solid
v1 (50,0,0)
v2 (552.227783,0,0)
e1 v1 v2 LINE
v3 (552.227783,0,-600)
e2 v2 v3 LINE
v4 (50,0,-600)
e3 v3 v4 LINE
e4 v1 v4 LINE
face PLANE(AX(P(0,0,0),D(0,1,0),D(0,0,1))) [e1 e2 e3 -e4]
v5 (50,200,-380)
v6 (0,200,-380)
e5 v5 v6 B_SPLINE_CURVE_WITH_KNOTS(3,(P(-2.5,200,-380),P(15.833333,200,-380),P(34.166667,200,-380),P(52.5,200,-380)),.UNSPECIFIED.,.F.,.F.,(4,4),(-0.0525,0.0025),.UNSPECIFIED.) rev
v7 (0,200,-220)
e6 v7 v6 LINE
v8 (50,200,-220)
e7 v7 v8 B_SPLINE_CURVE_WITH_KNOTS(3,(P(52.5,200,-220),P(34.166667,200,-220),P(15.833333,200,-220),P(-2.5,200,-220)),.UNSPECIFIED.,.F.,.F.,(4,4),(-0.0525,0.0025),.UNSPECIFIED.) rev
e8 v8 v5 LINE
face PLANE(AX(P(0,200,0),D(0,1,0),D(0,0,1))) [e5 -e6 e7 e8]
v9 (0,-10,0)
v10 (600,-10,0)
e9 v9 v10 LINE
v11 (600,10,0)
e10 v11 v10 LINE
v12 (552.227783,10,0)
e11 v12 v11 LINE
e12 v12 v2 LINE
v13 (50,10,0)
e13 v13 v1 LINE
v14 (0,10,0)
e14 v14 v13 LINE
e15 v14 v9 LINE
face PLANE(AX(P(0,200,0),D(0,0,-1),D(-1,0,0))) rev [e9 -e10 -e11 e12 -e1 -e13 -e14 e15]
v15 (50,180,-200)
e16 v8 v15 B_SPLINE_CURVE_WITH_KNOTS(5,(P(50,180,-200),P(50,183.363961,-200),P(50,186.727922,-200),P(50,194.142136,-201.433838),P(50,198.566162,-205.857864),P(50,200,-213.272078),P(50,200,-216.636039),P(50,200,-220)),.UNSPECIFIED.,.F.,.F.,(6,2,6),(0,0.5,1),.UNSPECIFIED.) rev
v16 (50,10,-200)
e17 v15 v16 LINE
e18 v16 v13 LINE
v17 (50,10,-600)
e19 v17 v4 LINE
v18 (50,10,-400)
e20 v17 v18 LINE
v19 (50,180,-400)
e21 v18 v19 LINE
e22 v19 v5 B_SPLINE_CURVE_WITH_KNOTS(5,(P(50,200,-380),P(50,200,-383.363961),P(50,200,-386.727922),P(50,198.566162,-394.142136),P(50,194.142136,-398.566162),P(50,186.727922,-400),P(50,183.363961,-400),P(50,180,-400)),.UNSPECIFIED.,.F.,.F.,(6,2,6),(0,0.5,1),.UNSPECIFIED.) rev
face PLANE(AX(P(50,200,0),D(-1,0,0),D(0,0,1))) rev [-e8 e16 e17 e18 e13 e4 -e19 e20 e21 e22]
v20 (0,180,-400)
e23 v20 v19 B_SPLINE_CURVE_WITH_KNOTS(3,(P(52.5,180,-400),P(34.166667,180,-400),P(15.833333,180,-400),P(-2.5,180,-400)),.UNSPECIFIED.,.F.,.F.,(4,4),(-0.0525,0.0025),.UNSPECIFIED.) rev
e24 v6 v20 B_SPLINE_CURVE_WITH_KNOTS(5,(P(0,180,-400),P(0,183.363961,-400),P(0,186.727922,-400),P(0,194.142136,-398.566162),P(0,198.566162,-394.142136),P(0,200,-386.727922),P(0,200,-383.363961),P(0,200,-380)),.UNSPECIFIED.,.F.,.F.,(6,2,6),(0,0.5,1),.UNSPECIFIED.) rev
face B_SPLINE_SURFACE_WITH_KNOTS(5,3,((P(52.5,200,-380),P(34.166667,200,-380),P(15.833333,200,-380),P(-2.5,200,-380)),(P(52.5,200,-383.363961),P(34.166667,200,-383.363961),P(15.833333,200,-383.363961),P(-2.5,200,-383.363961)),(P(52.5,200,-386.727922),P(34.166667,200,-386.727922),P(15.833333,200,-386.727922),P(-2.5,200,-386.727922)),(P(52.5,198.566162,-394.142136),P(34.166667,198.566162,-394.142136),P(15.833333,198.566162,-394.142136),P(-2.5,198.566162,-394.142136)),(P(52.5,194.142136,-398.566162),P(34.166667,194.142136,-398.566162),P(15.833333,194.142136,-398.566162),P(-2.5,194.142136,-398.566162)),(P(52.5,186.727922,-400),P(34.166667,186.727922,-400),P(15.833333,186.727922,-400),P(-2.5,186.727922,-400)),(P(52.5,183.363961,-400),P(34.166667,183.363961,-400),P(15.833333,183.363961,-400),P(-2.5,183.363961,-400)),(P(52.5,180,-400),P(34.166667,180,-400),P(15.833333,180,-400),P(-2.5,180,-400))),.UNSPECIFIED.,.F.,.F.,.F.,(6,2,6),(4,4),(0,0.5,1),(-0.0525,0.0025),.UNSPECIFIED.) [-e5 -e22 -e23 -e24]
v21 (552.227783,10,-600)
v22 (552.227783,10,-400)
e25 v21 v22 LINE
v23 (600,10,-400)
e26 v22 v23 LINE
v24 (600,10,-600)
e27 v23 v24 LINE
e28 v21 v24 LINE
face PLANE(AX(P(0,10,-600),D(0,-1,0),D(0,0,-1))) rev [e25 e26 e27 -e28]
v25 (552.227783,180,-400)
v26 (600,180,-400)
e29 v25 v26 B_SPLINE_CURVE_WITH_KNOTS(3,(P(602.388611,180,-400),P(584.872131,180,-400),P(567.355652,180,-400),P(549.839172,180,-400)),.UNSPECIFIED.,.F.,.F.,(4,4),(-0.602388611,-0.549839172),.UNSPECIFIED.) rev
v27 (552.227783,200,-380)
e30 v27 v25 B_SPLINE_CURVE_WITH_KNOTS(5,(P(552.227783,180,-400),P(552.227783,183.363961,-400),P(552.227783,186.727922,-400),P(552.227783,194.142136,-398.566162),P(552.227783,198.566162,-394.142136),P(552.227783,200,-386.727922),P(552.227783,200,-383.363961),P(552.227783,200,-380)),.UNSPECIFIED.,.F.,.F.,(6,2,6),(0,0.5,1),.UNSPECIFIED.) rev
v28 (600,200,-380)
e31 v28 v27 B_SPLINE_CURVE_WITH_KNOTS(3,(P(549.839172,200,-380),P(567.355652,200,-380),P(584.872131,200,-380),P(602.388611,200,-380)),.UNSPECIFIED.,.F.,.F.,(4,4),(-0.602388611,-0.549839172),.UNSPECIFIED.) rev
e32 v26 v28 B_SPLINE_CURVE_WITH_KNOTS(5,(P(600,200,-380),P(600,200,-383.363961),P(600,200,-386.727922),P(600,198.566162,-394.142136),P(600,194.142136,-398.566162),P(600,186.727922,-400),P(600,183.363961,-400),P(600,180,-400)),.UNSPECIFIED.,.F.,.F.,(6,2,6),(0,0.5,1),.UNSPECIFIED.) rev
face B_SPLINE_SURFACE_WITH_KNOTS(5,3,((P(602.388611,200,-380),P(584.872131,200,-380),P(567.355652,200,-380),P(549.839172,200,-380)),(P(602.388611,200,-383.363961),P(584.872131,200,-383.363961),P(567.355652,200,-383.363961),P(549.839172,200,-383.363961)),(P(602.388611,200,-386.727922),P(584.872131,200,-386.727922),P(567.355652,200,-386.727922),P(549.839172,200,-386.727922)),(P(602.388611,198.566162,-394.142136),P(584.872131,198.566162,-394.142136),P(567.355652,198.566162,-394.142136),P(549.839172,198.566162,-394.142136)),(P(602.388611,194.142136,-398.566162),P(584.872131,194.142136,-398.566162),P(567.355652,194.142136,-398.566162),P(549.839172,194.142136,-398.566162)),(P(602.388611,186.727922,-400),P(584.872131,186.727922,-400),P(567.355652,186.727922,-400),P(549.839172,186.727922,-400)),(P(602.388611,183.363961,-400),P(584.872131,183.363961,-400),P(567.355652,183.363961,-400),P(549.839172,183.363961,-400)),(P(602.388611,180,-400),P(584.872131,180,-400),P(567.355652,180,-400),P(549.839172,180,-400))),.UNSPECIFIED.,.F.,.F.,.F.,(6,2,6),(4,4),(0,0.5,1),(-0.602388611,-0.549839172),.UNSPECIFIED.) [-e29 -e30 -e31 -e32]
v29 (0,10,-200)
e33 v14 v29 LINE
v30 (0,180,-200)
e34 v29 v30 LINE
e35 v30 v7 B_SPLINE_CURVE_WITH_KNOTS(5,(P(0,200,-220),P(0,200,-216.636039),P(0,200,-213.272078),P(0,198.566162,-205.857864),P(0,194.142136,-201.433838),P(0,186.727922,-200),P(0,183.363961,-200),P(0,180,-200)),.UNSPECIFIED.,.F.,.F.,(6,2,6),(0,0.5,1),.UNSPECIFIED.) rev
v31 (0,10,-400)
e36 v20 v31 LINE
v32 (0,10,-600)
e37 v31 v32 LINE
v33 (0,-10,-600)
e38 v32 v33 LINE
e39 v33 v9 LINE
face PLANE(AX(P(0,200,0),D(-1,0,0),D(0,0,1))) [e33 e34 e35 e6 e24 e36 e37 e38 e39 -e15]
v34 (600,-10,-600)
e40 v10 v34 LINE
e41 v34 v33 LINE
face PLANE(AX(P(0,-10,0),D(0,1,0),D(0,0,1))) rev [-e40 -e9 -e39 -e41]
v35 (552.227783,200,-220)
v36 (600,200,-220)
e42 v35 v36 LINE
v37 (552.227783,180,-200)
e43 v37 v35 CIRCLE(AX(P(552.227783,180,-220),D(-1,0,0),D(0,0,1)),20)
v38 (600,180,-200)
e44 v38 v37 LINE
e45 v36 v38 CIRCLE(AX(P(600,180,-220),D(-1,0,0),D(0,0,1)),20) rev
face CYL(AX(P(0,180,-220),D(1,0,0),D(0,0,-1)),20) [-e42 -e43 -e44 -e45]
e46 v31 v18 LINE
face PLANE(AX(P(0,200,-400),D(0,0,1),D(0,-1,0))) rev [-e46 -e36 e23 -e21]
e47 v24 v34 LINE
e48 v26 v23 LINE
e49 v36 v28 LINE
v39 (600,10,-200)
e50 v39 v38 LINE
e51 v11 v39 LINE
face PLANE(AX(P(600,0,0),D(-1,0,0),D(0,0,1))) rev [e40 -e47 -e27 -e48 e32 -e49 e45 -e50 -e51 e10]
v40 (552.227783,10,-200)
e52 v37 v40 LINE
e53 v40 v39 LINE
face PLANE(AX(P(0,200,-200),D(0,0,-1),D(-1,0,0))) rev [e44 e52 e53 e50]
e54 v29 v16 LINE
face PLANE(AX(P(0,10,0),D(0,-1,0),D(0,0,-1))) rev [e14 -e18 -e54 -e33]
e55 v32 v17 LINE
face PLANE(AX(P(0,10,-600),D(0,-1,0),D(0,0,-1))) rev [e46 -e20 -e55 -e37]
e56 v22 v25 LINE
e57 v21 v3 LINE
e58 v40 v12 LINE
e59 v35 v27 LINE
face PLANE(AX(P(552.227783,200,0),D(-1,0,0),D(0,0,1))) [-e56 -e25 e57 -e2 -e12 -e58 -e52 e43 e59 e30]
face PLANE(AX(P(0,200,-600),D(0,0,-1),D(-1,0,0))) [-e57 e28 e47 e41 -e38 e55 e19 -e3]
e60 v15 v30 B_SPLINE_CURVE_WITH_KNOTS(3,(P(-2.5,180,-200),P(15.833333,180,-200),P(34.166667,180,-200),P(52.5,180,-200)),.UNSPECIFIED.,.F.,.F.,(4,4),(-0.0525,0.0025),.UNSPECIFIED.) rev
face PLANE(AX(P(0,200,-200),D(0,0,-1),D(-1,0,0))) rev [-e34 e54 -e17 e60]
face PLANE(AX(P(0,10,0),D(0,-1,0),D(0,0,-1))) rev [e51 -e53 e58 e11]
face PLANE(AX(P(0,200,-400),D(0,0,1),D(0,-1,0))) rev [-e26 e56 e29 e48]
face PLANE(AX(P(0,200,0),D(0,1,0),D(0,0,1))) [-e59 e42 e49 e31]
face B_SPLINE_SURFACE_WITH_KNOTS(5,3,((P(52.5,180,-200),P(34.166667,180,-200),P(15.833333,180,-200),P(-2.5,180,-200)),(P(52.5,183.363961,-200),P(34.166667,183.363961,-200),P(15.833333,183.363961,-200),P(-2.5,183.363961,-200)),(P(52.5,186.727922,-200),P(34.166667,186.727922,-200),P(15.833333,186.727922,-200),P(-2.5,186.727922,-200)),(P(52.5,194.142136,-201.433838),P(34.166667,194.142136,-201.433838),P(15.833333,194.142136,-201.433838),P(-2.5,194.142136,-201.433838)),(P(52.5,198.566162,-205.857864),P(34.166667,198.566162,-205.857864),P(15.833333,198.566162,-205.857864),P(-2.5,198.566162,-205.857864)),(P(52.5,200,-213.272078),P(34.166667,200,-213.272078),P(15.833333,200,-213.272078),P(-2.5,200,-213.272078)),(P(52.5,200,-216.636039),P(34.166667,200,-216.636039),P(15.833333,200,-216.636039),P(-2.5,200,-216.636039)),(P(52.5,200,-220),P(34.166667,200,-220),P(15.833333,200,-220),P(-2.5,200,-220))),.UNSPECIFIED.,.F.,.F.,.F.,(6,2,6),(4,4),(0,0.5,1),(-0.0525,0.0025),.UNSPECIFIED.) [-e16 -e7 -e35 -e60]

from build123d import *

# Parameters (mm, degrees)
ESBO_O1_W                  = 50
ESBO_O1_H                  = 600
RESSALTO_EXTRUS_O1_DEPTH   = 200
ESBO_O1_W_2                = 47.772216991
RESSALTO_EXTRUS_O1_2_DEPTH = 200
RESSALTO_EXTRUS_O4_START   = -210
ESBO_O4_W                  = 600
ESBO_O4_H                  = 600
RESSALTO_EXTRUS_O4_DEPTH   = 10
ESBO_O5_W                  = 200
ESBO_O5_H                  = 190
CORTE_EXTRUS_O1_DEPTH      = 872.779788708
ESBO_O6_W                  = 200
ESBO_O6_H                  = 190
CORTE_EXTRUS_O2_DEPTH      = 600
FILETE2_R                  = 20
FILETE3_SIZE               = 20
FILETE4_SIZE               = 20
FILETE5_SIZE               = 20


with BuildPart() as part:
    # Esboço1 → Ressalto-extrusão1 (new body)
    with BuildSketch(Plane(origin=(0, 0, 0), x_dir=(1, 0, 0), z_dir=(0, 1, 0))):
        with Locations((25, 300)):
            Rectangle(ESBO_O1_W, ESBO_O1_H)
    extrude(amount=RESSALTO_EXTRUS_O1_DEPTH)



with BuildPart() as body_2:
    # Esboço1 → Ressalto-extrus_o1 2 (new body)
    with BuildSketch(Plane(origin=(0, 0, 0), x_dir=(1, 0, 0), z_dir=(0, 1, 0))):
        with Locations((576.113891505, 300)):
            Rectangle(ESBO_O1_W_2, ESBO_O1_H)
    extrude(amount=RESSALTO_EXTRUS_O1_2_DEPTH)


with BuildPart() as part_1:
    add(part.part)

    add(body_2.part)  # Ressalto-extrusão4 merges body 2
    # Esboço4 → Ressalto-extrusão4 (add)
    with BuildSketch(Plane(origin=(0, 200, 0), x_dir=(1, 0, 0), z_dir=(0, 1, 0)).offset(RESSALTO_EXTRUS_O4_START)):
        with Locations((300, 300)):
            Rectangle(ESBO_O4_W, ESBO_O4_H)
    extrude(amount=RESSALTO_EXTRUS_O4_DEPTH)

    # Esboço5 → Corte-extrusão1 (cut, through all)
    with BuildSketch(Plane(origin=(600, 0, 0), x_dir=(0, 0, -1), z_dir=(1, 0, 0))):
        with Locations((100, 105)):
            Rectangle(ESBO_O5_W, ESBO_O5_H)
    extrude(amount=-CORTE_EXTRUS_O1_DEPTH, mode=Mode.SUBTRACT)

    # Esboço6 → Corte-extrusão2 (cut)
    with BuildSketch(Plane(origin=(600, 0, 0), x_dir=(0, 0, -1), z_dir=(1, 0, 0))):
        with Locations((500, 105)):
            Rectangle(ESBO_O6_W, ESBO_O6_H)
    extrude(amount=-CORTE_EXTRUS_O2_DEPTH, mode=Mode.SUBTRACT)

    # Filete2
    filete2_edges = [part_1.edges().sort_by_distance(p)[0] for p in [
        (576.113891505, 200, -200),
    ]]
    fillet(filete2_edges, radius=FILETE2_R)

    # Filete3
    # a fillet whose section is not a circle: 20 mm, written as the material it takes off along each edge
    with BuildSketch(Plane(origin=(650, 200, -400), x_dir=(0, 0, 1), z_dir=(-1, 0, 0))) as filete3_piece_1:
        with BuildLine():
            add(Edge.make_bspline([(FILETE3_SIZE, 0), (FILETE3_SIZE * 0.831801948466, 0), (FILETE3_SIZE * 0.663603896932, 0), (FILETE3_SIZE * 0.292893218813, -FILETE3_SIZE * 0.0716919198361), (FILETE3_SIZE * 0.0716919198361, -FILETE3_SIZE * 0.292893218813), (0, -FILETE3_SIZE * 0.663603896932), (0, -FILETE3_SIZE * 0.831801948466), (0, -FILETE3_SIZE)], knots=[0, 0, 0, 0, 0, 0, 0.5, 0.5, 1, 1, 1, 1, 1, 1], degree=5))
            Line((0, -FILETE3_SIZE), (0, 0))
            Line((0, 0), (FILETE3_SIZE, 0))
        make_face()
    extrude(amount=147.772216991, mode=Mode.SUBTRACT)

    # Filete4
    # a fillet whose section is not a circle: 20 mm, written as the material it takes off along each edge
    with BuildSketch(Plane(origin=(100, 200, -200), x_dir=(0, -1, 0), z_dir=(-1, 0, 0))) as filete4_piece_1:
        with BuildLine():
            add(Edge.make_bspline([(FILETE4_SIZE, 0), (FILETE4_SIZE * 0.831801948466, 0), (FILETE4_SIZE * 0.663603896932, 0), (FILETE4_SIZE * 0.292893218813, -FILETE4_SIZE * 0.0716919198361), (FILETE4_SIZE * 0.0716919198361, -FILETE4_SIZE * 0.292893218813), (0, -FILETE4_SIZE * 0.663603896932), (0, -FILETE4_SIZE * 0.831801948466), (0, -FILETE4_SIZE)], knots=[0, 0, 0, 0, 0, 0, 0.5, 0.5, 1, 1, 1, 1, 1, 1], degree=5))
            Line((0, -FILETE4_SIZE), (0, 0))
            Line((0, 0), (FILETE4_SIZE, 0))
        make_face()
    extrude(amount=150, mode=Mode.SUBTRACT)

    # Filete5
    # a fillet whose section is not a circle: 20 mm, written as the material it takes off along each edge
    with BuildSketch(Plane(origin=(100, 200, -400), x_dir=(0, 0, 1), z_dir=(-1, 0, 0))) as filete5_piece_1:
        with BuildLine():
            add(Edge.make_bspline([(FILETE5_SIZE, 0), (FILETE5_SIZE * 0.831801948466, 0), (FILETE5_SIZE * 0.663603896932, 0), (FILETE5_SIZE * 0.292893218813, -FILETE5_SIZE * 0.0716919198361), (FILETE5_SIZE * 0.0716919198361, -FILETE5_SIZE * 0.292893218813), (0, -FILETE5_SIZE * 0.663603896932), (0, -FILETE5_SIZE * 0.831801948466), (0, -FILETE5_SIZE)], knots=[0, 0, 0, 0, 0, 0, 0.5, 0.5, 1, 1, 1, 1, 1, 1], degree=5))
            Line((0, -FILETE5_SIZE), (0, 0))
            Line((0, 0), (FILETE5_SIZE, 0))
        make_face()
    extrude(amount=150, mode=Mode.SUBTRACT)


solid = part_1.part
